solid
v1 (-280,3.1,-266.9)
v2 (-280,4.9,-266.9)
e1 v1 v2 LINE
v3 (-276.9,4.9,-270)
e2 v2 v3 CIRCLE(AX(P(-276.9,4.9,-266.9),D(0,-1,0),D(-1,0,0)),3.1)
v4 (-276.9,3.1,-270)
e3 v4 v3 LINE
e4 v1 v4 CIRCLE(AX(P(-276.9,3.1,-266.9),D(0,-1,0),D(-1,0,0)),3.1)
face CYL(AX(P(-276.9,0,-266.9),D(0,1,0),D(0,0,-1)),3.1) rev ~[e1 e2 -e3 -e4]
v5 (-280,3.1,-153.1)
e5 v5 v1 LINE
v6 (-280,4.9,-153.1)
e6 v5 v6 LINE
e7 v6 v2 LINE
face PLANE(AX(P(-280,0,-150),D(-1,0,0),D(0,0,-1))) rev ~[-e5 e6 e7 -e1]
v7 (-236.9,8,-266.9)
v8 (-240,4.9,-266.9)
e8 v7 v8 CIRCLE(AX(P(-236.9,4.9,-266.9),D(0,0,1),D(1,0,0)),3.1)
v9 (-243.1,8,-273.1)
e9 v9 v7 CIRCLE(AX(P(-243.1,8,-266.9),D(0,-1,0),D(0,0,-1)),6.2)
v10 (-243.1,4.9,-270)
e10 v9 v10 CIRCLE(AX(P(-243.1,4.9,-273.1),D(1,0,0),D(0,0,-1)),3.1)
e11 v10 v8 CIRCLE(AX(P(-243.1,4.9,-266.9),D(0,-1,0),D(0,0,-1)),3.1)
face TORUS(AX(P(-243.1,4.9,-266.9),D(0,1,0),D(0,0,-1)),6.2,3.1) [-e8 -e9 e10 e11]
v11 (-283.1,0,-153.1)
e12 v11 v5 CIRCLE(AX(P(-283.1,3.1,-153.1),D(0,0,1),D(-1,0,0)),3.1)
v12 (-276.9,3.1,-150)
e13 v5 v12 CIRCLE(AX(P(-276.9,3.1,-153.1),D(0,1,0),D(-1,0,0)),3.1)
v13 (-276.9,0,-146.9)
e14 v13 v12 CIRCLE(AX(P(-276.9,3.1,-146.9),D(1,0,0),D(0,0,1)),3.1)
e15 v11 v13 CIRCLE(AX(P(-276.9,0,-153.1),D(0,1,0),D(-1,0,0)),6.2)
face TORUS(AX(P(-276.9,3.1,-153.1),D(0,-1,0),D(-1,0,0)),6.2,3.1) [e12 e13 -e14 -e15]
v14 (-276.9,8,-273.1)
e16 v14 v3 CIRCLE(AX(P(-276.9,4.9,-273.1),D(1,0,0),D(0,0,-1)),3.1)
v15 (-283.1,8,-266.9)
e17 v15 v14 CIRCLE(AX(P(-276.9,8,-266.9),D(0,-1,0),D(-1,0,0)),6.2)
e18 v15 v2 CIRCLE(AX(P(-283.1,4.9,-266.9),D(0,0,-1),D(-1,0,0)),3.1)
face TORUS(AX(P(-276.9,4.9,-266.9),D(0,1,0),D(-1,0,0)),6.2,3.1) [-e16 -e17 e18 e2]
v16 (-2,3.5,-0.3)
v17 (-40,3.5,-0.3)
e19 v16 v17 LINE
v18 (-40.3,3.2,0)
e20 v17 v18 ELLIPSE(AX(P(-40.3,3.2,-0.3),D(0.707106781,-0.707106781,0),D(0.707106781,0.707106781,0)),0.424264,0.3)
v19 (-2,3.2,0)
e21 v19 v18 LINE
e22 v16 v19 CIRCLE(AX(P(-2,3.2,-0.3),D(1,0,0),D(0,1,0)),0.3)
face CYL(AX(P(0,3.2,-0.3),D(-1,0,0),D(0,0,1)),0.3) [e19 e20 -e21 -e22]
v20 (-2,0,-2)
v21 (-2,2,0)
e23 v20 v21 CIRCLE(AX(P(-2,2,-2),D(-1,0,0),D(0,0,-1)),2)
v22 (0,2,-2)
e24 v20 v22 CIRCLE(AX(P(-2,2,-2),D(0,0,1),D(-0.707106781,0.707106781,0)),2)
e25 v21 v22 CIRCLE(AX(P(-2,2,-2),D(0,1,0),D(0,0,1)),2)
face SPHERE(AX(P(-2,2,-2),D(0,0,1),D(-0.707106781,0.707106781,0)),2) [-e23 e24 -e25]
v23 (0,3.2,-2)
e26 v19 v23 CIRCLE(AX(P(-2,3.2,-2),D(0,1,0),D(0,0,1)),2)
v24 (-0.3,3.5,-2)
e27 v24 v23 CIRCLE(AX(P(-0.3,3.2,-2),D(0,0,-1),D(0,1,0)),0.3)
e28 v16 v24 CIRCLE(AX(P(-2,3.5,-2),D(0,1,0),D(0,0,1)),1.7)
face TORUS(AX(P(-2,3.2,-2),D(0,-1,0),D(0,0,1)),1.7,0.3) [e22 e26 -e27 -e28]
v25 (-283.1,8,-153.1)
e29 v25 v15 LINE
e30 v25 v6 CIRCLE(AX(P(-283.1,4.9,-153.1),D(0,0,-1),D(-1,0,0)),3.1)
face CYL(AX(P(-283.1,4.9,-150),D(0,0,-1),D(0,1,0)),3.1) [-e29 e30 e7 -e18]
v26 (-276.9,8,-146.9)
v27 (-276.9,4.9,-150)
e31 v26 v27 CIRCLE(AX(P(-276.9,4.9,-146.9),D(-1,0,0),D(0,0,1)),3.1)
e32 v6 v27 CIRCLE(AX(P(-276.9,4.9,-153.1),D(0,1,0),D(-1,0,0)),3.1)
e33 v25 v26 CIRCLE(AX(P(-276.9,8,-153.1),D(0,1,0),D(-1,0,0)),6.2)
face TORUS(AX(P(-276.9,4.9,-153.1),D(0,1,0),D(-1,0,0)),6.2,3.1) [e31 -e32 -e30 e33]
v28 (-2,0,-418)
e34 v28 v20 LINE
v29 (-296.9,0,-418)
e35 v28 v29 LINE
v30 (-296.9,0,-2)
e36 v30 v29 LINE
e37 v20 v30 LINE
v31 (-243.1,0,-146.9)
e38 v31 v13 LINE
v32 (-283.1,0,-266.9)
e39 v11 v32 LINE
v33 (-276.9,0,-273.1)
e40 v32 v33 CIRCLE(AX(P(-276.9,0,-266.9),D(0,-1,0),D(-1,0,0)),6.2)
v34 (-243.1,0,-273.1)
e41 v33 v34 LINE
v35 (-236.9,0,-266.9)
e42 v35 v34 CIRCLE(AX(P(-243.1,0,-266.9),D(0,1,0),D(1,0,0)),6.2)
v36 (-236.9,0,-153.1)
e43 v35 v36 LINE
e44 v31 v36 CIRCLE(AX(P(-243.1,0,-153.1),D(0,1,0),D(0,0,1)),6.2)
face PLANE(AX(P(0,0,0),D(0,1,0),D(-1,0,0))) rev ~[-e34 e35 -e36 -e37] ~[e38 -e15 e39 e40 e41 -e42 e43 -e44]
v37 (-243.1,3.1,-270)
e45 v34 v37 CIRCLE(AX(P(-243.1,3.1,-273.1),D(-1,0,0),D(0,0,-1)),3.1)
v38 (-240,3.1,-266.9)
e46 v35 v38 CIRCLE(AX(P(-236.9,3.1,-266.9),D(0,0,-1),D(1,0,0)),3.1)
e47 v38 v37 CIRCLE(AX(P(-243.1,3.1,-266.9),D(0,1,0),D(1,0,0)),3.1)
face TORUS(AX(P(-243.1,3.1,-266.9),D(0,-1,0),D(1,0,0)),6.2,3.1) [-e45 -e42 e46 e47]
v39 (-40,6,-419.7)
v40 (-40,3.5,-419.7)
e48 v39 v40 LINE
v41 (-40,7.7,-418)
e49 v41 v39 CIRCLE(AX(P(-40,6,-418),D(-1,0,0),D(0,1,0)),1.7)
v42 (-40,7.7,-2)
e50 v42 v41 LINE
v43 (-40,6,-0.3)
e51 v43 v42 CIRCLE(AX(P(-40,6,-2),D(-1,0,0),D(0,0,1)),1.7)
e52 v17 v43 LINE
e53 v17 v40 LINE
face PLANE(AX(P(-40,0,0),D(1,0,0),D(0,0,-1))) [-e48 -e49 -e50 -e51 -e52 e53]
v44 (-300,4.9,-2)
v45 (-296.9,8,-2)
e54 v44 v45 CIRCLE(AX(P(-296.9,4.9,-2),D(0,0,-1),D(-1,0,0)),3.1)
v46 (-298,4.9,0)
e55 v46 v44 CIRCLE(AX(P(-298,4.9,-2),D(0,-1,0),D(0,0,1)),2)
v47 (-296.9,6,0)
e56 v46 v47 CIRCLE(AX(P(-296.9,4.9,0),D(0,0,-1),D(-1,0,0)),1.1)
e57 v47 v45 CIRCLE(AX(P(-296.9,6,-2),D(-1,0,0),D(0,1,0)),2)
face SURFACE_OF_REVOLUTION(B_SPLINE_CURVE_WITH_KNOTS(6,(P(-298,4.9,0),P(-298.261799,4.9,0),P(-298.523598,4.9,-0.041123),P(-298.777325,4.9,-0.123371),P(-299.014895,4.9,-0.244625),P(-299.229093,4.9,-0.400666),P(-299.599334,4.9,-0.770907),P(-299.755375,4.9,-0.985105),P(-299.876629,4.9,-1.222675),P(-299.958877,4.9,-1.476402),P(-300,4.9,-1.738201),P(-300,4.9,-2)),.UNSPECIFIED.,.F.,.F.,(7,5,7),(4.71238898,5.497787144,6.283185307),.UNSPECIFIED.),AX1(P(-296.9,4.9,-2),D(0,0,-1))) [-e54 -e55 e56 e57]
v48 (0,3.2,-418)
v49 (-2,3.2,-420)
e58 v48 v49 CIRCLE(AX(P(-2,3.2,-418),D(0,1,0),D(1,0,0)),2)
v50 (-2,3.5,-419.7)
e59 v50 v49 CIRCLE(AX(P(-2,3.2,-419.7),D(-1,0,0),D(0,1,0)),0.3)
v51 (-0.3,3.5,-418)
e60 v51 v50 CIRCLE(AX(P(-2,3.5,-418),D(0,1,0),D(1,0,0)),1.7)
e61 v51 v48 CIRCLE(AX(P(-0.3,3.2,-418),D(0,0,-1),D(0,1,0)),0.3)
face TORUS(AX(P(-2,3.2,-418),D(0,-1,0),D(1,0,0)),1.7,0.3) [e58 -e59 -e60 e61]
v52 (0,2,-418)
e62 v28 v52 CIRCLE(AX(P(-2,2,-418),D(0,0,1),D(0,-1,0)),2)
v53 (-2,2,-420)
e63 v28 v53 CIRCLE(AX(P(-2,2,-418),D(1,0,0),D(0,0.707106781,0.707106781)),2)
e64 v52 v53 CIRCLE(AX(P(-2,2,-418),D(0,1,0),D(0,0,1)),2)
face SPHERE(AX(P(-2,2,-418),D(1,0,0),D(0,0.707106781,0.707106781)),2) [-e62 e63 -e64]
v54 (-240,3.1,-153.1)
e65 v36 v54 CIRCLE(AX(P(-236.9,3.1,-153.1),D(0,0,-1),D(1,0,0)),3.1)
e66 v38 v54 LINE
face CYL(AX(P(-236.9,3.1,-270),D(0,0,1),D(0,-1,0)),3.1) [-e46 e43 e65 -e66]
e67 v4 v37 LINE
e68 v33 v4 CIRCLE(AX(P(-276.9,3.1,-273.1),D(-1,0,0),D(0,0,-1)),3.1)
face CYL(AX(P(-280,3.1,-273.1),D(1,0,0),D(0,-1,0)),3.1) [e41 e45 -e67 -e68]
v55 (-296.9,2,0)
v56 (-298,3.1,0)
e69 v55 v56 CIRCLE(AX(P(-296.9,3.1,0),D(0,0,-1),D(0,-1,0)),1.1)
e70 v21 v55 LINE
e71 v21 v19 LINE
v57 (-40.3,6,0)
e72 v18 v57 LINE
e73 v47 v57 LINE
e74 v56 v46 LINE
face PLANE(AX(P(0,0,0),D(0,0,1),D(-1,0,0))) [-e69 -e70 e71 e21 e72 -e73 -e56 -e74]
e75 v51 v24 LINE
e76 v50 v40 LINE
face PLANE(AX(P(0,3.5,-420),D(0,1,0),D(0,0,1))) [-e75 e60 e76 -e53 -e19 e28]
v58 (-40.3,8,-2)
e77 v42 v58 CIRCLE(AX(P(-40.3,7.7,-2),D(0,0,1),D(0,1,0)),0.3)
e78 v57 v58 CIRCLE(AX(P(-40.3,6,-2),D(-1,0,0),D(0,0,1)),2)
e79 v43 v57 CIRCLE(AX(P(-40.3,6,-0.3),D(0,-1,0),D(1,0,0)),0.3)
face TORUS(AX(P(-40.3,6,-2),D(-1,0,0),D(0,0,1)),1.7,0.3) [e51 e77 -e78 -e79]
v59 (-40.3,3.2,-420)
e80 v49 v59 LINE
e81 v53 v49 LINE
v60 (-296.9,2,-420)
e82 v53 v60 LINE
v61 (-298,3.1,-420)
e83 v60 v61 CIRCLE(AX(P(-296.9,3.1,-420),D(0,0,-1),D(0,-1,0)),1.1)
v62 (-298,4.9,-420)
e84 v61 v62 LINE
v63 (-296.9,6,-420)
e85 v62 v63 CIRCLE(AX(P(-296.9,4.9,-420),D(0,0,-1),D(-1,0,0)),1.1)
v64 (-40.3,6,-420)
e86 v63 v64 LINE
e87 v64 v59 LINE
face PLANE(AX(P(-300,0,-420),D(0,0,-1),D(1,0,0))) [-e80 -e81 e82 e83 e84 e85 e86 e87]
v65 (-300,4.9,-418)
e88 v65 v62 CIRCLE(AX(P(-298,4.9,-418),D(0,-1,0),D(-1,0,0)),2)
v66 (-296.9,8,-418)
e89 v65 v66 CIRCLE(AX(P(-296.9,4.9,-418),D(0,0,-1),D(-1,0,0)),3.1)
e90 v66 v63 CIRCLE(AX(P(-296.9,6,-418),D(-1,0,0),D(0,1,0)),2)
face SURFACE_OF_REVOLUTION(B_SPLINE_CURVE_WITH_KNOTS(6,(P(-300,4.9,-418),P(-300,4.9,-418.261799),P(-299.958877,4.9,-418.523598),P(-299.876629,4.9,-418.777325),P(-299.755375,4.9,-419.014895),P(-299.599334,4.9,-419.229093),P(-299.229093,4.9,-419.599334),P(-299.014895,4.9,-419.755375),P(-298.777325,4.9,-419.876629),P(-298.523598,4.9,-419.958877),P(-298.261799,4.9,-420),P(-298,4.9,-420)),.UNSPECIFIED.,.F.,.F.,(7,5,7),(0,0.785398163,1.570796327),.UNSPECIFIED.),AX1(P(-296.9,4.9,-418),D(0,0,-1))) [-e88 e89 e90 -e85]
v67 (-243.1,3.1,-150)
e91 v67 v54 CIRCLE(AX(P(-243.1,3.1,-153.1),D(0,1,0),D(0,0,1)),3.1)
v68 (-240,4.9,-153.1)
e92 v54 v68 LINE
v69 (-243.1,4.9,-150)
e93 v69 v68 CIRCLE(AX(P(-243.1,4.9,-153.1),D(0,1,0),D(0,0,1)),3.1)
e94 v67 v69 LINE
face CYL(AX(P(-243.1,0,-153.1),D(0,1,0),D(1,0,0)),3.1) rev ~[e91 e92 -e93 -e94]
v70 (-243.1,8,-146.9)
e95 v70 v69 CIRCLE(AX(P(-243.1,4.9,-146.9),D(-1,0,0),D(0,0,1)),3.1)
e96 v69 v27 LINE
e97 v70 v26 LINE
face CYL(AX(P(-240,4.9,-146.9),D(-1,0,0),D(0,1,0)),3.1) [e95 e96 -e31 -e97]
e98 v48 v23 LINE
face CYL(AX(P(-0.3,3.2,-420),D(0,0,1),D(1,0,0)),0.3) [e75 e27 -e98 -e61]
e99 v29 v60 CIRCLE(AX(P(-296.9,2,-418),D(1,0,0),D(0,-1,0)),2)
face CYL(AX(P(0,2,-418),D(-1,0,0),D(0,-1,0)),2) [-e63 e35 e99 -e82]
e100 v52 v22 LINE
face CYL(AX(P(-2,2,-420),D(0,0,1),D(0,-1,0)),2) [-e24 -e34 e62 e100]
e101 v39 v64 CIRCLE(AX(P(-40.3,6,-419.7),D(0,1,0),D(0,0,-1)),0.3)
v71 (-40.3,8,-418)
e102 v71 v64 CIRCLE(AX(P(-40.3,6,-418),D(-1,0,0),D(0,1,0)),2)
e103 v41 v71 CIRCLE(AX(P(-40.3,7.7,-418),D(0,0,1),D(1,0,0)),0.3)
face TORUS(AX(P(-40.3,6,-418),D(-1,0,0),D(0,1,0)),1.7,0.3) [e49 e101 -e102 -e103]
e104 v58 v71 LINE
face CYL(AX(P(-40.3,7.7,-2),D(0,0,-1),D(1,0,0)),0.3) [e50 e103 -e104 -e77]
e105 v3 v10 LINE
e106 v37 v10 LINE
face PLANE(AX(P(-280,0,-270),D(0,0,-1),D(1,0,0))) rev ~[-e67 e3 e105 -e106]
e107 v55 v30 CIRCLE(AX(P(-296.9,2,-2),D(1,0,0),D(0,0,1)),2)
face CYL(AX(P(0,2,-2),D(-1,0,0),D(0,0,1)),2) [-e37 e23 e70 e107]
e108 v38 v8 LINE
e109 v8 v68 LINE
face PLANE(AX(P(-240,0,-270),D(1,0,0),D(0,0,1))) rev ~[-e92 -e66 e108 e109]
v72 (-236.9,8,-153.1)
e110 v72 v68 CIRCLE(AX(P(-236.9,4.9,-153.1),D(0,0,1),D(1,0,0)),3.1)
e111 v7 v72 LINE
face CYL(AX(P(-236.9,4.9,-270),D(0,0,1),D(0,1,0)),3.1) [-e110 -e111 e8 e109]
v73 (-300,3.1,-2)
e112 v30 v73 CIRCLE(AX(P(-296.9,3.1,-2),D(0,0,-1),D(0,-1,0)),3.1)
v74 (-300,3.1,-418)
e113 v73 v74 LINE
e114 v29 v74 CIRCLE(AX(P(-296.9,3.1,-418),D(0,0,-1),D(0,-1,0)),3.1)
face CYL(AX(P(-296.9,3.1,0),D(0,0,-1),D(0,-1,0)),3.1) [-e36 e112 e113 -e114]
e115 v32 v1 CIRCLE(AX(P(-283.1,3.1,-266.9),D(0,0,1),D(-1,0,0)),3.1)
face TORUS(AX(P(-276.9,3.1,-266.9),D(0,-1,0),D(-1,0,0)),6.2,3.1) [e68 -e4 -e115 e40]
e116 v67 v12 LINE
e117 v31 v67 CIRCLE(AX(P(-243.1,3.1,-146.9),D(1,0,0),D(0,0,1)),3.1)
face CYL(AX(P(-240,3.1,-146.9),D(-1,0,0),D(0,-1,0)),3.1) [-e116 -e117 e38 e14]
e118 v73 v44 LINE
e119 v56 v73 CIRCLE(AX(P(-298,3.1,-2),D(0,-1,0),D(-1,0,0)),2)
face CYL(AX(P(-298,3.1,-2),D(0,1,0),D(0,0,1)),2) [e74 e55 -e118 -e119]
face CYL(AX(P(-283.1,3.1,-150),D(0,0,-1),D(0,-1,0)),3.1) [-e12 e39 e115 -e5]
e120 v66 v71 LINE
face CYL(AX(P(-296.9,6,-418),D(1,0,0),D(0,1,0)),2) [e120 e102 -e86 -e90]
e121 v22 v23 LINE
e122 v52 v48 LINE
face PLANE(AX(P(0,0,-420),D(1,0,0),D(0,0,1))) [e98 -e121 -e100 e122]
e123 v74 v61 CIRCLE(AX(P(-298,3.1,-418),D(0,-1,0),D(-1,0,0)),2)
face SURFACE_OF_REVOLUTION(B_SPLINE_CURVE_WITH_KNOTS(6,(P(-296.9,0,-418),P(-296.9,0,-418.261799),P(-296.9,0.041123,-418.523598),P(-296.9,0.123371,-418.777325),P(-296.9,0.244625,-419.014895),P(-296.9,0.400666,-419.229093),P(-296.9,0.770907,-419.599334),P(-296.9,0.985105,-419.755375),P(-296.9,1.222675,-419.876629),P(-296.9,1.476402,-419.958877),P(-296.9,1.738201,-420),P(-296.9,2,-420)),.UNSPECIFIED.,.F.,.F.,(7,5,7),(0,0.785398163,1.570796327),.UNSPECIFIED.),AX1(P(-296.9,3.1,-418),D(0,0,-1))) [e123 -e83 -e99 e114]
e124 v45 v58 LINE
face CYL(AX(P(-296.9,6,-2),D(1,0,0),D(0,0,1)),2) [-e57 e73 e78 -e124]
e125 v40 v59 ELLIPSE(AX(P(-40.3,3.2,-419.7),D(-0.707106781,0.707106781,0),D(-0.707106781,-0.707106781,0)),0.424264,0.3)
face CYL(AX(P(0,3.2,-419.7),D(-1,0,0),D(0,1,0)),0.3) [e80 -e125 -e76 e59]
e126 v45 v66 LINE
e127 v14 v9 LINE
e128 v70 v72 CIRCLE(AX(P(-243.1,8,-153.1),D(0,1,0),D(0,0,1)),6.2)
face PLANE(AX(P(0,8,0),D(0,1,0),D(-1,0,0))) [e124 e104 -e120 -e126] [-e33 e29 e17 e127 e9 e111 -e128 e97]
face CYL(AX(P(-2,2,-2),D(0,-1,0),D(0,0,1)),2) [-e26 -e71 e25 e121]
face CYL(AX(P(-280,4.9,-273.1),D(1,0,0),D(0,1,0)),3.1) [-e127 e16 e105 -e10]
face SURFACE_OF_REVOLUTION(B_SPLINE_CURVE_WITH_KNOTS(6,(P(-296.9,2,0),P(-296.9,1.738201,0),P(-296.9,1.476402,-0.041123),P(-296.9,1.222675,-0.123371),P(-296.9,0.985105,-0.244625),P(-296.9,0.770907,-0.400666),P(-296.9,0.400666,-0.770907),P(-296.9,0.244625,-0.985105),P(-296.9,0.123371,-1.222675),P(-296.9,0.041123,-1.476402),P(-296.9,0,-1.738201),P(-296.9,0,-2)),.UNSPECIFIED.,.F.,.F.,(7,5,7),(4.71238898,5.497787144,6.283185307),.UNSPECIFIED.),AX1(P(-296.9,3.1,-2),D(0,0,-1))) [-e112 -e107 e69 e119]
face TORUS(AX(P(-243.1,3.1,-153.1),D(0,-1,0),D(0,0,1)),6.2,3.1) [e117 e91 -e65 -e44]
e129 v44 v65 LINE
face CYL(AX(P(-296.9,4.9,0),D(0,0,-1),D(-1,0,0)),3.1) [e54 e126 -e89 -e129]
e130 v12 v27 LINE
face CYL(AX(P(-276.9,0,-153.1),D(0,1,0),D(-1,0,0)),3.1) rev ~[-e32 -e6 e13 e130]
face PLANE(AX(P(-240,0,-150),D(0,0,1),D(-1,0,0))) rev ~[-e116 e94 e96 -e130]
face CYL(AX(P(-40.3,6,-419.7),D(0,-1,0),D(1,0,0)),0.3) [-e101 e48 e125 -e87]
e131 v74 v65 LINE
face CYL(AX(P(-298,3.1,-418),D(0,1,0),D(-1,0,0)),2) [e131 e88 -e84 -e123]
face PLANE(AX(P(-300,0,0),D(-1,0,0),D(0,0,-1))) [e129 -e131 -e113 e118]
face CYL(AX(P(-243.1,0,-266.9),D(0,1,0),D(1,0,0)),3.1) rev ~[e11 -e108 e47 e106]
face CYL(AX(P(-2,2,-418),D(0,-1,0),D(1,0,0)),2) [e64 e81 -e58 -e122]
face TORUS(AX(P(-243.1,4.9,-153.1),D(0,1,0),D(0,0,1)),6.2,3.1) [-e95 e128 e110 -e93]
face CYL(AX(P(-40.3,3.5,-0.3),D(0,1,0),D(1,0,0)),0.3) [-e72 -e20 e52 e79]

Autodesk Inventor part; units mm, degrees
ref_plane "YZ Plane" through (0, 0, 0) normal (1, 0, 0) x (0, 1, 0)
ref_plane "XZ Plane" through (0, 0, 0) normal (0, 1, 0) x (-1, 0, 0)
ref_plane "XY Plane" through (0, 0, 0) normal (0, 0, 1) x (1, 0, 0)
sketch "Sketch1" plane through (0, 0, 0) normal (0, 1, 0) x (-1, 0, 0)
  line L0 (0, 0) -> (300, 0)
  line L1 (300, 0) -> (300, -420)
  line L2 (300, -420) -> (0, -420)
  line L3 (0, -420) -> (0, 0)
  line L4 (240, -150) -> (280, -150)
  line L5 (280, -150) -> (280, -270)
  line L6 (280, -270) -> (240, -270)
  line L7 (240, -270) -> (240, -150)
  line L8 (240, -150) -> (280, -270) construction
  line L9 (280, -150) -> (240, -270) construction
  dimension "d0" = 300
  dimension "d1" = 420
  dimension "d5" = 40
  dimension "d6" = 120
extrude "Extrusion1" add sketch "Sketch1" along normal blind 8
sketch "Sketch2" plane through (0, 0, 0) normal (1, 0, 0) x (0, 0, -1)
  line L0 (150, 0) -> (270, 0) projected
  line L1 (210, 0) -> (210, 4)
  line L2 (420, 0) -> (420, 8) projected
  line L3 (0, 4.5) -> (420, 4.5)
  line L4 (420, 4.5) -> (420, 3.5)
  line L5 (420, 3.5) -> (0, 3.5)
  line L6 (0, 3.5) -> (0, 4.5)
  line L7 (0, 4.5) -> (420, 3.5) construction
  line L8 (420, 4.5) -> (0, 3.5) construction
  line L9 (0, 0) -> (0, 8) projected
  line L10 (420, 3.5) -> (0, 3.5)
  line L11 (0, 3.5) -> (0, 8)
  line L12 (0, 8) -> (420, 8)
  line L13 (420, 8) -> (420, 3.5)
  dimension "d7" = 4
  dimension "d8" = 1
extrude "Extrusion2" cut sketch "Sketch2" against normal blind 40
fillet "Fillet1" radius 3.1 14 edges at (-300, 8, -210) (-300, 0, -210) (-280, 8, -210) (-260, 8, -270) (-240, 8, -210) (-280, 0, -210) (-260, 0, -270) (-280, 4, -270) (-240, 4, -270) (-240, 4, -150) (-260, 0, -150) (-260, 8, -150) (-280, 4, -150) (-240, 0, -210)
fillet "Fillet2" radius 2 11 edges at (-299.092, 7.092, 0) (-300, 4, 0) (-299.092, 0.908, 0) (-148.45, 0, 0) (-168.45, 8, 0) (-299.092, 7.092, -420) (-300, 4, -420) (-299.092, 0.908, -420) (-148.45, 0, -420) (-168.45, 8, -420) (0, 0, -210)
fillet "Fillet3" radius 0.3 8 edges at (-40, 7.4142, -419.4142) (-40, 4.75, -420) (-40, 7.4142, -0.5858) (-40, 4.75, 0) (-40, 8, -210) (-20, 3.5, -420) (0, 3.5, -210) (-20, 3.5, 0)
fillet "Fillet4" radius 2 6 edges at (-0.0879, 3.4121, -0.0879) (-0.5858, 0.5858, -0.5858) (0, 2.6, 0) (-0.0879, 3.4121, -419.9121) (-0.5858, 0.5858, -419.4142) (0, 2.6, -420)
properties part number "RightFlap"
